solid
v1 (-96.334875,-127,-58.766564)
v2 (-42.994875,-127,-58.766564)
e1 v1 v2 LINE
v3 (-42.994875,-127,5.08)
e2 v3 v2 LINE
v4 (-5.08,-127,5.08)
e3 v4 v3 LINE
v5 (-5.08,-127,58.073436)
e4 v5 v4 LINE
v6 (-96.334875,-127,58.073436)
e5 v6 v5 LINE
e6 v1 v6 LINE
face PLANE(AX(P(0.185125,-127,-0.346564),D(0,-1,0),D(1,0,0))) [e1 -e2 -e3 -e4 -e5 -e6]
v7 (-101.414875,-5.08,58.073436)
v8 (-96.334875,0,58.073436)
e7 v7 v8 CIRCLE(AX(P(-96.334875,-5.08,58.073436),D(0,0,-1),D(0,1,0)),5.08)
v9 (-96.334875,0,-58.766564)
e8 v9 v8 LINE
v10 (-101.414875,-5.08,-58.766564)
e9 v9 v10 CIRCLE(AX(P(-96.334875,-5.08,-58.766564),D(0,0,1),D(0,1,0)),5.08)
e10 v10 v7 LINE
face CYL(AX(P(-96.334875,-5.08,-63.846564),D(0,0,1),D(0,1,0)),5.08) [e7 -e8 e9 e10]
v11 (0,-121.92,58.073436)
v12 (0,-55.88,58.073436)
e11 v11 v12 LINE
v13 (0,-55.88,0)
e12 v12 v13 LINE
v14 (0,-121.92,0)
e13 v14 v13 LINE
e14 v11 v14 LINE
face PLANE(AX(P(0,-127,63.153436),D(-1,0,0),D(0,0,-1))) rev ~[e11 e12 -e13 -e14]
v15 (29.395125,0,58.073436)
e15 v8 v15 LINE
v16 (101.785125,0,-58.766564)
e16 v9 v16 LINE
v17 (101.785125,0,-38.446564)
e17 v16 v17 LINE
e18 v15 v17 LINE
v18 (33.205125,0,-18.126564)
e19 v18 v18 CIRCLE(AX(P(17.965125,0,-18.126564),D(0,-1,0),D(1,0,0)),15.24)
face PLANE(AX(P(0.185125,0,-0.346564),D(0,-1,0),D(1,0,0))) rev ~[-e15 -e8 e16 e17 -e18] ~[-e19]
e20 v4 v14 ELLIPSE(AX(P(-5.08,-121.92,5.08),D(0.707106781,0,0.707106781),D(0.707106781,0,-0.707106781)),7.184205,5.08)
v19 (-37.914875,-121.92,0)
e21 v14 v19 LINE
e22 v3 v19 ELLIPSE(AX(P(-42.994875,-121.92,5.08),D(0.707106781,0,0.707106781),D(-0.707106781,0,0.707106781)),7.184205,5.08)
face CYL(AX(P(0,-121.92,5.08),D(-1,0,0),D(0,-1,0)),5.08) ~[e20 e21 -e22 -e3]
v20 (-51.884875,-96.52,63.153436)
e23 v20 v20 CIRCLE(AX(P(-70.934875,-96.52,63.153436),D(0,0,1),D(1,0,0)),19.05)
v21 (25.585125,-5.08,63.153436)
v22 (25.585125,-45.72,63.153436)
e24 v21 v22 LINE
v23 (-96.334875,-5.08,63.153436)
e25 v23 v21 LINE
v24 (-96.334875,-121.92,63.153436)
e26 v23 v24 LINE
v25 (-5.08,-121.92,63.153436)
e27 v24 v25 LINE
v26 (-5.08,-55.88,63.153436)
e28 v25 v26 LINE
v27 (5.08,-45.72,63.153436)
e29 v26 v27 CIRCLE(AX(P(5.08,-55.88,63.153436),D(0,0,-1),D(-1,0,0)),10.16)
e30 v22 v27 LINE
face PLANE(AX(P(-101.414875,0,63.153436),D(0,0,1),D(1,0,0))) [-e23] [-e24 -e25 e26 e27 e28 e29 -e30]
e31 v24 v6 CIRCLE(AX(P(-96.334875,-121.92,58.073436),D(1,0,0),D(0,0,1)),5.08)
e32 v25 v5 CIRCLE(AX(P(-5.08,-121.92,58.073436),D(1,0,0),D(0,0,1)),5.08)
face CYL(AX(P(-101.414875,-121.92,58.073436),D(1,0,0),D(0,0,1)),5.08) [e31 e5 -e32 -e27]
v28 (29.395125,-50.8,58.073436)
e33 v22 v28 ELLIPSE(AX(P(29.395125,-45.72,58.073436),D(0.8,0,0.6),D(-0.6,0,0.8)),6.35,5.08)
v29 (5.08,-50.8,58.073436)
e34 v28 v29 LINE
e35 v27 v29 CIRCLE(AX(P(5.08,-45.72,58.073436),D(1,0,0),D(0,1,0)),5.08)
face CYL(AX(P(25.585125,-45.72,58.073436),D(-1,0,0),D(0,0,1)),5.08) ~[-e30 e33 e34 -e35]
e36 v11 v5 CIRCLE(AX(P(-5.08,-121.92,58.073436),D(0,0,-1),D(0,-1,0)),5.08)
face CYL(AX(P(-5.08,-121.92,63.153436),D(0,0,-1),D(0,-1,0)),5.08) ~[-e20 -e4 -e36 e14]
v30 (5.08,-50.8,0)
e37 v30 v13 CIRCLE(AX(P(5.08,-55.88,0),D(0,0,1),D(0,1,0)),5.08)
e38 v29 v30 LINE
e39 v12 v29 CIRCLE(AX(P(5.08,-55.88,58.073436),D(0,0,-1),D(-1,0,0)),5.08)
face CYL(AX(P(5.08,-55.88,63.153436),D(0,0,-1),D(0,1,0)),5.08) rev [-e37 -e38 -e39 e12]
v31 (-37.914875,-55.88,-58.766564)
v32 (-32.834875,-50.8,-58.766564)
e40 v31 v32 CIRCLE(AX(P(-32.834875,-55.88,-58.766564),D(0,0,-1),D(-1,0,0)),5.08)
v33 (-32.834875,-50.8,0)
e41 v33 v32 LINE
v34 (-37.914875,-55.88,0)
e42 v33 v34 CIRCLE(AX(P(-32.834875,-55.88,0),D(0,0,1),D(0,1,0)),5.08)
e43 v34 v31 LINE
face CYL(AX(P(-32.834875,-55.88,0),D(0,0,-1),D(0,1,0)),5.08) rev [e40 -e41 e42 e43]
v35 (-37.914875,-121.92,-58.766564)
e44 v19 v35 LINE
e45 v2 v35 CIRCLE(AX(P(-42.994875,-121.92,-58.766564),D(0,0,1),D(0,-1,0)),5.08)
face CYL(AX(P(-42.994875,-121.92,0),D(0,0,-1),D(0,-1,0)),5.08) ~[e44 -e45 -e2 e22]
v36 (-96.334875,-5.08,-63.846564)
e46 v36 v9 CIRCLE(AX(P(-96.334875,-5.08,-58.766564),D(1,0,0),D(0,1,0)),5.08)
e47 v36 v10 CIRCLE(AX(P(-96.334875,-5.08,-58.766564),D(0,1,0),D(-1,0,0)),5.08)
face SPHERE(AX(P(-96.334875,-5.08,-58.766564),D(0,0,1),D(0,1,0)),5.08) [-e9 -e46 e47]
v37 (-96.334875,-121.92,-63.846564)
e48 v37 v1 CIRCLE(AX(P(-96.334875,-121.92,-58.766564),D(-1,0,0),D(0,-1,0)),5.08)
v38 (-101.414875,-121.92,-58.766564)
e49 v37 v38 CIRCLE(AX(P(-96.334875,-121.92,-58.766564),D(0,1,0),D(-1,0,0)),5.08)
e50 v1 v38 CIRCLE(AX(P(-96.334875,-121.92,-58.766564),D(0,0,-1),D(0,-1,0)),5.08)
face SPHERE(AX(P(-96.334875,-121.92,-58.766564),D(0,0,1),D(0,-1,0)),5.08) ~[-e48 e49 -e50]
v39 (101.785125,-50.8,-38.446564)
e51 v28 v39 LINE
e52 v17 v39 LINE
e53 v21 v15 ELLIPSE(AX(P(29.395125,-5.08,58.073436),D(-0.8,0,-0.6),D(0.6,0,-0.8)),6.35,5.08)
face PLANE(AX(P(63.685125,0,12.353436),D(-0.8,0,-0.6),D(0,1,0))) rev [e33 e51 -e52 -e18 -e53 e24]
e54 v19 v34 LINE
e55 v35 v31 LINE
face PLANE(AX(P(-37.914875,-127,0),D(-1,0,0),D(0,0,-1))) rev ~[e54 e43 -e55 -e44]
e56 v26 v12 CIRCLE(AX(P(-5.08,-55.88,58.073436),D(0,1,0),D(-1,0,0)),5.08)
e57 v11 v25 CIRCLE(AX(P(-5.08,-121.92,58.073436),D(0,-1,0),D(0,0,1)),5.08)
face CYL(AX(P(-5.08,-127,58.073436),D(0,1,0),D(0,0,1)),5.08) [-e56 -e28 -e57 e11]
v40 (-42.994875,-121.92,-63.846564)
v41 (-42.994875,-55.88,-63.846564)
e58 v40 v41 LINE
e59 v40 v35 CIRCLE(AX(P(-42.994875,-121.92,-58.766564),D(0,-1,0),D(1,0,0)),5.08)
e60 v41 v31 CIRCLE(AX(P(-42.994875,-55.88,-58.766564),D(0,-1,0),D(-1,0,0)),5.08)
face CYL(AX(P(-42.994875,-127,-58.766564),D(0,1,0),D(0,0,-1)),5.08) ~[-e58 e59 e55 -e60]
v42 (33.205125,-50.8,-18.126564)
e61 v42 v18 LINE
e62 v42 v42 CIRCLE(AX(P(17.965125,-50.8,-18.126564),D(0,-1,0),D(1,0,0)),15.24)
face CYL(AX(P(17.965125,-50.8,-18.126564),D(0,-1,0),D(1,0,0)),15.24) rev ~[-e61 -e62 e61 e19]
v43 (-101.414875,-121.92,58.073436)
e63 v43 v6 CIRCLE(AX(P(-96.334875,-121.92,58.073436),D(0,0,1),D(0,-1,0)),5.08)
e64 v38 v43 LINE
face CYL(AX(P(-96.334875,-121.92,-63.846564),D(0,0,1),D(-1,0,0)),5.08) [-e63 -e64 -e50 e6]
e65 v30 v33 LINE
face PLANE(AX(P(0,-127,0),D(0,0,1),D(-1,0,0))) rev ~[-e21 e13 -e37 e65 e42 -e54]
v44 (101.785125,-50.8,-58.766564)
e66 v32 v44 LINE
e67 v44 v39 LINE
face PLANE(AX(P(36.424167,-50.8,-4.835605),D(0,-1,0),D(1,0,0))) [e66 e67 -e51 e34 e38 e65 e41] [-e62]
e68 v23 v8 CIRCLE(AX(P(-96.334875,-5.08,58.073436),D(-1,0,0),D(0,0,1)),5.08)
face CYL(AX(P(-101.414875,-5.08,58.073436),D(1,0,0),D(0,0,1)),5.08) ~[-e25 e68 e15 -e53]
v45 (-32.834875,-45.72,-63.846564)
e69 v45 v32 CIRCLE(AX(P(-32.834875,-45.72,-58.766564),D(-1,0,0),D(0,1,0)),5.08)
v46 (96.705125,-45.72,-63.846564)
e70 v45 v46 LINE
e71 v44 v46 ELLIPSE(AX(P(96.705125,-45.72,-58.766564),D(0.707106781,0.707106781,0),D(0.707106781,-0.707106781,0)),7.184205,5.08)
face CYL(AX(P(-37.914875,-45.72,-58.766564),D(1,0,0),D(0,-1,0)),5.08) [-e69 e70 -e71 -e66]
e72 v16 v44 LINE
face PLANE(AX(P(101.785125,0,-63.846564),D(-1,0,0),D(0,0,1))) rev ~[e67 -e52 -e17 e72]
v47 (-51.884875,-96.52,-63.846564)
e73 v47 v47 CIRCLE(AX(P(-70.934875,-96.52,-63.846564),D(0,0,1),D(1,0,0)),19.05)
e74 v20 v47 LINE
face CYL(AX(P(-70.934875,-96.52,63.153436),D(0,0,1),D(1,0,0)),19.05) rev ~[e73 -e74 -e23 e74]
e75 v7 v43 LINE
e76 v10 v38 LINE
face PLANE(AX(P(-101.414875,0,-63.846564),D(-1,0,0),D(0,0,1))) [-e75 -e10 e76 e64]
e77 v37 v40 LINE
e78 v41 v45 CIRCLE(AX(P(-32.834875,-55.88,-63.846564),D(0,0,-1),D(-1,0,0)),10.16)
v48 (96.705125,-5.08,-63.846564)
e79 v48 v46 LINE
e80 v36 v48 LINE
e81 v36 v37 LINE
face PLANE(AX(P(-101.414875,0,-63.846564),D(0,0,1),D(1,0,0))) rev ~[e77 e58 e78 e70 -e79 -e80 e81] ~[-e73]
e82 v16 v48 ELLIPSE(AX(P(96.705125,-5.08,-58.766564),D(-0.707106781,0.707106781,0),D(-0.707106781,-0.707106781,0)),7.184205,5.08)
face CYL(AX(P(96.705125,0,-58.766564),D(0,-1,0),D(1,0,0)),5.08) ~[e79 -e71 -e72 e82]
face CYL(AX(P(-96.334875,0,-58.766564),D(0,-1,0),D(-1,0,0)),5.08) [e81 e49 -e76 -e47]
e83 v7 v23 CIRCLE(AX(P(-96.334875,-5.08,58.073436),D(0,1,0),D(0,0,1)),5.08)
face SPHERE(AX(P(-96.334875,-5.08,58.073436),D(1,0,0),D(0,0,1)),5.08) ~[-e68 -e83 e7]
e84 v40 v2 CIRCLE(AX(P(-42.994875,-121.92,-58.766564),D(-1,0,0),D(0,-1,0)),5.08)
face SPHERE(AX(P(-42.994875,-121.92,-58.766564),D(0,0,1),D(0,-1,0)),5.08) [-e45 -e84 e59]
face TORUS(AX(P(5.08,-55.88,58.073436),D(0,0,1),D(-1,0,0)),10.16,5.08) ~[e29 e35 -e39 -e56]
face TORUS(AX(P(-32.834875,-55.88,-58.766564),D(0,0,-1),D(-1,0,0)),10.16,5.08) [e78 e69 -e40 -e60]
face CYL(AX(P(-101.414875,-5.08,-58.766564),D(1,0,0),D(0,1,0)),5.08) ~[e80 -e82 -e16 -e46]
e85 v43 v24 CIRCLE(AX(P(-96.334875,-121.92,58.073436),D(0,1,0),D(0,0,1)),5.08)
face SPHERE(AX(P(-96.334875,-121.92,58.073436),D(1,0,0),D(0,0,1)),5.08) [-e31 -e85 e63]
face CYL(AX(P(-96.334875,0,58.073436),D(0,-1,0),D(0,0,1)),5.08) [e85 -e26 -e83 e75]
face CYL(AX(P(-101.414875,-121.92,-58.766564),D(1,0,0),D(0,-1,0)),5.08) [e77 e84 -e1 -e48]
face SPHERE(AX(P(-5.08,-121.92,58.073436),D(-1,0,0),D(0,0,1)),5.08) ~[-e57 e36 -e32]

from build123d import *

# Parameters (mm, degrees)
F0_W     = 203.2
F0_H     = 127
F1_DEPTH = 127
F3_DEPTH = 76.2
F4_SIZE2 = 101.6
F4_SIZE  = 76.2
F5_R     = 5.08
F6_R     = 15.24
F7_DEPTH = 50.8
F8_R     = 19.05
F9_DEPTH = 127


with BuildPart() as f1:
    # F0 (on Front) → F1 (new body)
    with BuildSketch(Plane.XZ):
        with Locations((0.1851254753, -0.3465637565)):
            Rectangle(F0_W, F0_H)
    extrude(amount=F1_DEPTH)

    # F2 (on face) → F3 (cut)
    with BuildSketch(Plane.XZ.offset(127)):
        Polygon((101.7851254753, 63.1534362435), (0, 63.1534362435), (0, 0), (-37.9148745247, 0), (-37.9148745247, -63.8465637565), (101.7851254753, -63.8465637565), align=None)
    extrude(amount=-F3_DEPTH, mode=Mode.SUBTRACT)

    # F4
    f4_edges = [f1.edges().sort_by_distance(p)[0] for p in [
        (101.785125, -25.4, 63.153436),
    ]]
    f4_side = f1.faces().sort_by_distance((-21.603245, -52.585928, 63.153436))[0]
    chamfer(f4_edges, length=F4_SIZE, length2=F4_SIZE2, reference=f4_side)

    # F5
    f5_edges = [f1.edges().sort_by_distance(p)[0] for p in [
        (-50.707437, -127, 63.153436),
        (0, -88.9, 63.153436),
        (0, -127, 31.576718),
        (-18.957437, -127, 0),
        (-37.914875, -127, -31.923282),
        (-37.914875, -50.8, -31.923282),
        (12.792563, -50.8, 63.153436),
        (0, -50.8, 31.576718),
        (-37.914875, 0, 63.153436),
        (-101.414875, -63.5, 63.153436),
        (-101.414875, -127, -0.346564),
        (-101.414875, 0, -0.346564),
        (-69.664875, -127, -63.846564),
        (-37.914875, -88.9, -63.846564),
        (101.785125, -25.4, -63.846564),
        (0.185125, 0, -63.846564),
        (-101.414875, -63.5, -63.846564),
        (31.935125, -50.8, -63.846564),
    ]]
    fillet(f5_edges, radius=F5_R)

    # F6 (on face) → F7 (cut, through all)
    with BuildSketch(Plane.XZ.offset(50.8)):
        with Locations((17.9651254753, -18.1265637565)):
            Circle(F6_R)
    extrude(amount=-F7_DEPTH, mode=Mode.SUBTRACT)

    # F8 (on face) → F9 (cut, through all)
    with BuildSketch(Plane.XY.offset(63.1534362435)):
        with Locations((-70.9348745247, -96.52)):
            Circle(F8_R)
    extrude(amount=-F9_DEPTH, mode=Mode.SUBTRACT)


solid = f1.part
